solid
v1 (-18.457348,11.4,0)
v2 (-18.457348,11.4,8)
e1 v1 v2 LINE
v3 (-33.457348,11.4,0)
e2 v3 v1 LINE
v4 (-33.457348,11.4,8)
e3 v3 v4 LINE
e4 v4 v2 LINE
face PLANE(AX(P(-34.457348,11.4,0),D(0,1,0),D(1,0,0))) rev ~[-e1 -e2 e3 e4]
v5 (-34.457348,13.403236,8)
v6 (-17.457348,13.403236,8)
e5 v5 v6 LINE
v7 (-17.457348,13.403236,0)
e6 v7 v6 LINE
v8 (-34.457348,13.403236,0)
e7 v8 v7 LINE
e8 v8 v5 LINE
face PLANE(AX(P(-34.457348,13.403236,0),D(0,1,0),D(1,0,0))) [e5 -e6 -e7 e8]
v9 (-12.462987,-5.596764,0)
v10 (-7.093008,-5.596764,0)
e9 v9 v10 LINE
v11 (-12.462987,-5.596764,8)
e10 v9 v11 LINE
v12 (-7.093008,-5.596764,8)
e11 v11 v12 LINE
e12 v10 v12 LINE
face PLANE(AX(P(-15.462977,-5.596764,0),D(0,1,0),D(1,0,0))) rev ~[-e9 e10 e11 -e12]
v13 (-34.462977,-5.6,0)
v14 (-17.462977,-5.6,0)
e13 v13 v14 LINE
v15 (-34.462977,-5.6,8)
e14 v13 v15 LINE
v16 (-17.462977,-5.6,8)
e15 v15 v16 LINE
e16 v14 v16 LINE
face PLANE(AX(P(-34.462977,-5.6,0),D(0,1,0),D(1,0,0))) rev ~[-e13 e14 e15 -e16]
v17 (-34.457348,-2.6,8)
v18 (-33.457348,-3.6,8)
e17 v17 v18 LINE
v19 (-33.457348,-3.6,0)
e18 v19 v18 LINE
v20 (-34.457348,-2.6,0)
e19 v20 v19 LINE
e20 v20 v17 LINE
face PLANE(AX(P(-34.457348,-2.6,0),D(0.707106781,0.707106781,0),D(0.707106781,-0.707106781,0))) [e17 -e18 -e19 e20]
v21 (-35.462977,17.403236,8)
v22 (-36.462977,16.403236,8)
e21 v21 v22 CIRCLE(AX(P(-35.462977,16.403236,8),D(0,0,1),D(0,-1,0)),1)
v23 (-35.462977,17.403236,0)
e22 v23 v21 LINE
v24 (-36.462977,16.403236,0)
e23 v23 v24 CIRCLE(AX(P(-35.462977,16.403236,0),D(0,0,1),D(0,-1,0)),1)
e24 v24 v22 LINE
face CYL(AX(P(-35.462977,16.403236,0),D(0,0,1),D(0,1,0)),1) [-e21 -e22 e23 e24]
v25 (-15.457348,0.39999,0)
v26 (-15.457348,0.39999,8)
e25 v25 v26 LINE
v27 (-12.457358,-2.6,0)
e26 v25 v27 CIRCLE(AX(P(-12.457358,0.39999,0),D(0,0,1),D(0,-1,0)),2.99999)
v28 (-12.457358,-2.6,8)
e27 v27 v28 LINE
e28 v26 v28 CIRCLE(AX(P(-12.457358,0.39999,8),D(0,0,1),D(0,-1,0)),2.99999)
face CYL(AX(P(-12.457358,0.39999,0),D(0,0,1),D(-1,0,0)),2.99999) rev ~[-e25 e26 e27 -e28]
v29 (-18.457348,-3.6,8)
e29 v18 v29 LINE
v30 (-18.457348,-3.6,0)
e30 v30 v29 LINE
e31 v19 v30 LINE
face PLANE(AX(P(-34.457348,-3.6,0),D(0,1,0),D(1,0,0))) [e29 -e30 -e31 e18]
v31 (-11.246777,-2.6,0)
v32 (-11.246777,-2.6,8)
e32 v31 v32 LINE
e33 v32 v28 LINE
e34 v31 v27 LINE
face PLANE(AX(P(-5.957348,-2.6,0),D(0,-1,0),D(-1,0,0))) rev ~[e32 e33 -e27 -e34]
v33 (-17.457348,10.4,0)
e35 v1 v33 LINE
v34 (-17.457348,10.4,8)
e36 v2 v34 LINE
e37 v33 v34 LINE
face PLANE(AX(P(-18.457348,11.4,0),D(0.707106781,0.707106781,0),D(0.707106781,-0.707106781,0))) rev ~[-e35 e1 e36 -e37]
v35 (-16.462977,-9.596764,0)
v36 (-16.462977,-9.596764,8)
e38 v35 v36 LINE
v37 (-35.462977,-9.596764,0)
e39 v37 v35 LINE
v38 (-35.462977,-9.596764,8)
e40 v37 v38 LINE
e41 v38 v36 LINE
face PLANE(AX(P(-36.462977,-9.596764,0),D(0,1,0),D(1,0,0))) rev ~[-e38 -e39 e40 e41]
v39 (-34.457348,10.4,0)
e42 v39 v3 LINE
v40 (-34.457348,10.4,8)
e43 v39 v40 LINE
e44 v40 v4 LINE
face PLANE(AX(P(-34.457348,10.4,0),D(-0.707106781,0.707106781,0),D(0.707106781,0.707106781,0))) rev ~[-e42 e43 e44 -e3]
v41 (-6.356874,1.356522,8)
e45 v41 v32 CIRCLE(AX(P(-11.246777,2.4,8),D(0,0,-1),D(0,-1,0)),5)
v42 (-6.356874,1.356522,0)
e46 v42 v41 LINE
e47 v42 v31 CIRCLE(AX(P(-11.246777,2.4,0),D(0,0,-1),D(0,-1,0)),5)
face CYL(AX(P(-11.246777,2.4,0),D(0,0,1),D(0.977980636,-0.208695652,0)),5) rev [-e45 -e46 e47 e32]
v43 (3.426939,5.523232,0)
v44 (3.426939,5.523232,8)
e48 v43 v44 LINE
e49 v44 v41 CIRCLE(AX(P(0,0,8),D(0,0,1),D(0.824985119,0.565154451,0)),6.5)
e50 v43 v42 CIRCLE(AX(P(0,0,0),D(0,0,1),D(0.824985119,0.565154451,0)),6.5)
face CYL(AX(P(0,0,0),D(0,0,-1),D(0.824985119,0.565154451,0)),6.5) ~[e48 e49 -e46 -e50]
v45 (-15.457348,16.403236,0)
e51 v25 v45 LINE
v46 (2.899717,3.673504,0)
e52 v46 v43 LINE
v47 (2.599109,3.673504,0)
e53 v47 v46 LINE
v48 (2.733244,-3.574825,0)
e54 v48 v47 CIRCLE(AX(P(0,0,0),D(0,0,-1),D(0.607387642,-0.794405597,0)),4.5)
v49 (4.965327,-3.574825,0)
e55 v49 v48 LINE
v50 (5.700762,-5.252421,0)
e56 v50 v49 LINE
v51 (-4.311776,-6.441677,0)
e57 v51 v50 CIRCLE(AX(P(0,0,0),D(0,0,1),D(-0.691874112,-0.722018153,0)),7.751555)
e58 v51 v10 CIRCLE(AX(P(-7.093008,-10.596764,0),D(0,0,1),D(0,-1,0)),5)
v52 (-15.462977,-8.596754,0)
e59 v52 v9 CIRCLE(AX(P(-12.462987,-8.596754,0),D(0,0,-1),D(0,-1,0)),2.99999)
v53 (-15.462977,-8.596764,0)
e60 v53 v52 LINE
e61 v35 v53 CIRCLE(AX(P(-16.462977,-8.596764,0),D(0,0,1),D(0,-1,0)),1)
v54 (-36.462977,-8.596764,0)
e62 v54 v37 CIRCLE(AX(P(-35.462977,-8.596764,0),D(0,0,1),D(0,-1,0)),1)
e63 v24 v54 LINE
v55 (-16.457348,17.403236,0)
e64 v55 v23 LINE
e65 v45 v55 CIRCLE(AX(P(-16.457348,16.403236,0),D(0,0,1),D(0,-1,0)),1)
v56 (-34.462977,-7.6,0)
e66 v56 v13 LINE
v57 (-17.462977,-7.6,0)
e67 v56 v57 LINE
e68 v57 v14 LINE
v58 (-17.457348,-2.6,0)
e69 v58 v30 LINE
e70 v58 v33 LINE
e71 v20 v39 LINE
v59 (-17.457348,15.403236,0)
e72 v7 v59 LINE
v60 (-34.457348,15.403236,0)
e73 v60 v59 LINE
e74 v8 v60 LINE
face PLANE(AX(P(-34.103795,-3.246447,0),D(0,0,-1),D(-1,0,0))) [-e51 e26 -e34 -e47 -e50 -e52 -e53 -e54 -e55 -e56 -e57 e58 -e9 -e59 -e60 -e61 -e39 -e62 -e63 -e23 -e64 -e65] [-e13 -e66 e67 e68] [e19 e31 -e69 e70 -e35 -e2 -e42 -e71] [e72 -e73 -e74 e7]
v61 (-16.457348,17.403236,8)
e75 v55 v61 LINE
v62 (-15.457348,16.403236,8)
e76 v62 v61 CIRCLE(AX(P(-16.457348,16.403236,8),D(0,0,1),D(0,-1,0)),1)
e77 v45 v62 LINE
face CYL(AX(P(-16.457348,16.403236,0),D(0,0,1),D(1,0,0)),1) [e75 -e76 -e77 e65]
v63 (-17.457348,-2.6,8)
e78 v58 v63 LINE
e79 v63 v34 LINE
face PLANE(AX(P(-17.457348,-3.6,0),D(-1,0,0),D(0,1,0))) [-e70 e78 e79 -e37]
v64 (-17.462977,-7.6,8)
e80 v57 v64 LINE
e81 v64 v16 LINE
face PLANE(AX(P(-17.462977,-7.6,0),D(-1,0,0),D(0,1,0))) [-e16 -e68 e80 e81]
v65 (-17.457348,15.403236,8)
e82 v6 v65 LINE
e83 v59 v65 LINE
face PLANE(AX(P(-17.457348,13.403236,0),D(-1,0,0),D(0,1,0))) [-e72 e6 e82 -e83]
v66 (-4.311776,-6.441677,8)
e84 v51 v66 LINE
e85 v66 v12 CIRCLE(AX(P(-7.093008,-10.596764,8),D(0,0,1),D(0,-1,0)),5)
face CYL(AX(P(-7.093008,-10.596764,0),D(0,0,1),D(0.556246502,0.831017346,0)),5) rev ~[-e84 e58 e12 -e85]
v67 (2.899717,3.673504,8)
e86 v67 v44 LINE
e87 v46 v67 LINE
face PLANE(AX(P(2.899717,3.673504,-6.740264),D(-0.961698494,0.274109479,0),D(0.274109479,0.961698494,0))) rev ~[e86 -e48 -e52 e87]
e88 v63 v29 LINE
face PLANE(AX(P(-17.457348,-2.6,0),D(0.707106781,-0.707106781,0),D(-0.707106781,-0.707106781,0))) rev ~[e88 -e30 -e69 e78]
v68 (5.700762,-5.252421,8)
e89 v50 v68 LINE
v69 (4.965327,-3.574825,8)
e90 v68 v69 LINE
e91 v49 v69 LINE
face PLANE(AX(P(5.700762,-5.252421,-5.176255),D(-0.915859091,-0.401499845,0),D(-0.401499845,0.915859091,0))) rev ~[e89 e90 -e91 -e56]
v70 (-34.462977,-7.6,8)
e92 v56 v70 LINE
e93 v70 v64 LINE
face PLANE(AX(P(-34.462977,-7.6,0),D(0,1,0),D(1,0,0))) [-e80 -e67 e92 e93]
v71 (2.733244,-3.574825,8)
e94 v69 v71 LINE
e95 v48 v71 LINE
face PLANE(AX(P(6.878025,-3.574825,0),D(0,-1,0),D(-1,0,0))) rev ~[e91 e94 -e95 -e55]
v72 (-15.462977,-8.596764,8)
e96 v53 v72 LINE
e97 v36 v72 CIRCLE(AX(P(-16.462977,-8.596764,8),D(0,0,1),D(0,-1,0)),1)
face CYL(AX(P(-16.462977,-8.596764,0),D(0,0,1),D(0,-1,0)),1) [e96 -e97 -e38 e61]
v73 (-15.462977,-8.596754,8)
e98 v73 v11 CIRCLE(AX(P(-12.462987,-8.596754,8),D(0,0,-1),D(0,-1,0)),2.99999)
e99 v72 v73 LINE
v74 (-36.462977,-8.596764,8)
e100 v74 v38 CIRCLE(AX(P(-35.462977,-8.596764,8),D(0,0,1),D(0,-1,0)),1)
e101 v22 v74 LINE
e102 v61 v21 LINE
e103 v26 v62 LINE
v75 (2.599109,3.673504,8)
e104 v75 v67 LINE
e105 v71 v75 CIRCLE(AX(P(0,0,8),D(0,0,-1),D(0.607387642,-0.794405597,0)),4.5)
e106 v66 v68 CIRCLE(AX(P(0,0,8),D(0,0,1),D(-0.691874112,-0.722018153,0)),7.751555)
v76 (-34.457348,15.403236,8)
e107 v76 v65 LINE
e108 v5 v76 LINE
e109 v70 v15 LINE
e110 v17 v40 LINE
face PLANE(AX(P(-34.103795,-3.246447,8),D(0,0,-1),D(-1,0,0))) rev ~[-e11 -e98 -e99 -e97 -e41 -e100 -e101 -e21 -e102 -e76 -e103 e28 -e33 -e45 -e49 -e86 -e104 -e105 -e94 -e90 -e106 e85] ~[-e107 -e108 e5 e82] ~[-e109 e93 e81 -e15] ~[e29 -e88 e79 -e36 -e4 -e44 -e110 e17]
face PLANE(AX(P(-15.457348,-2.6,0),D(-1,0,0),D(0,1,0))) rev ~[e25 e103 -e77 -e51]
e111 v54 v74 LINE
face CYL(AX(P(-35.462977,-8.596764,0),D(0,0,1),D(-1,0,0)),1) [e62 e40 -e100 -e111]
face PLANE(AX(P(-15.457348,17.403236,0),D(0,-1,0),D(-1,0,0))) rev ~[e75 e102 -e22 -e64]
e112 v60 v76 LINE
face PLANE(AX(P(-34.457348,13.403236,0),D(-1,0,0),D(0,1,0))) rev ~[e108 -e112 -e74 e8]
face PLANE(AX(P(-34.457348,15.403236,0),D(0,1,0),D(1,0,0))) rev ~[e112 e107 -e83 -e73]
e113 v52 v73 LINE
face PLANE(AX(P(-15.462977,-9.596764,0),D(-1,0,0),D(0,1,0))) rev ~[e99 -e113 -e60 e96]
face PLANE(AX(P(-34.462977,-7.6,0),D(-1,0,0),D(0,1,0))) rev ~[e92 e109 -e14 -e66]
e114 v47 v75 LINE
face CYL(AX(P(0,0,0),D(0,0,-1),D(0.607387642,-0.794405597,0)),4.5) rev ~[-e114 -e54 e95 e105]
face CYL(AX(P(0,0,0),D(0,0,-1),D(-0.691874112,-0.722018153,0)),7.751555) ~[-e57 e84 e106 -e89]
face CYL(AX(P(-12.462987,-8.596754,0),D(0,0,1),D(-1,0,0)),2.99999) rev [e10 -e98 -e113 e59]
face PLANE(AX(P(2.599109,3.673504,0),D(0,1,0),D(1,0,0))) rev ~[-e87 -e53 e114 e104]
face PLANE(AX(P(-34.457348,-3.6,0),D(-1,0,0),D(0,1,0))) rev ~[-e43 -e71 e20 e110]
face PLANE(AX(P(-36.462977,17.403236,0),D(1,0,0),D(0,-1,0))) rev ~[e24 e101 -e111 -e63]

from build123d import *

# Parameters (mm, degrees)
F0_W        = 17
F0_H        = 2
F0_H_2      = 15
F1_DEPTH    = 8
F2_R        = 5
F3_T1_DEPTH = 8
F3_T3_DEPTH = 18.3525106995
F3_T5_DEPTH = 21.4805273161
F4_R        = 1
F5_R        = 2.99999


# Not quite as in the source:
# - a fillet or chamfer that OpenCascade refuses, or shapes differently, is made with other operations: its cross-section is extruded or revolved along the edge and cut away or added
# - a fillet or chamfer is up to 0.001 mm smaller than in the source, because OpenCascade refuses the exact size


with BuildPart() as f1:
    # F0 (on Top) → F1 (new body)
    with BuildSketch(Plane.XY):
        with BuildLine():
            ThreePointArc((2.7332443879, -3.5748251868), (-4.4992296638, -0.0832612306), (2.5991092476, 3.6735039294))
            Line((2.5991092476, 3.6735039294), (5.3624032747, 3.6735039294))
            ThreePointArc((5.3624032747, 3.6735039294), (-3.1508257353, 5.6852701946), (-5.9573484034, -2.6))
            Line((-5.9573484034, -2.6), (-15.4573484034, -2.6))
            Line((-15.4573484034, -2.6), (-15.4573484034, 13.4))
            Line((-15.4573484034, 13.4), (-15.4573484034, 17.4032363431))
            Line((-15.4573484034, 17.4032363431), (-36.4629774356, 17.4032363431))
            Line((-36.4629774356, 17.4032363431), (-36.4629774356, 11.4032363431))
            Line((-36.4629774356, 11.4032363431), (-36.4629774356, -9.5967636569))
            Line((-36.4629774356, -9.5967636569), (-15.4629774356, -9.5967636569))
            Line((-15.4629774356, -9.5967636569), (-15.4629774356, -5.5967636569))
            Line((-15.4629774356, -5.5967636569), (-5.3631004506, -5.5967636569))
            ThreePointArc((-5.3631004506, -5.5967636569), (1.2632530504, -7.6479279289), (6.8780254985, -3.5748251868))
            Line((6.8780254985, -3.5748251868), (2.7332443879, -3.5748251868))
        make_face()
        with Locations((-25.9629774356, -6.6)):
            Rectangle(F0_W, F0_H, mode=Mode.SUBTRACT)
        with Locations((-25.9573484034, 3.9)):
            Rectangle(F0_W, F0_H_2, mode=Mode.SUBTRACT)
        with Locations((-25.9573484034, 14.4032363431)):
            Rectangle(F0_W, F0_H, mode=Mode.SUBTRACT)
    extrude(amount=F1_DEPTH)

    # F2
    f2_edges = [f1.edges().sort_by_distance(p)[0] for p in [
        (-5.957348, -2.6, 4),
        (-5.3631, -5.596764, 4),
    ]]
    fillet(f2_edges, radius=F2_R)

    # F3: chamfer of 1 on 6 edges, made by hand

    # F3_s2 → F3_t1 (join)
    with BuildSketch(Plane.XY):
        Polygon((-34.4573484034, -2.6), (-33.4573484034, -3.6), (-34.4573484034, -3.6), align=None)
        Polygon((-34.4573484034, 10.4), (-33.4573484034, 11.4), (-34.4573484034, 11.4), align=None)
        Polygon((-18.4573484034, 11.4), (-17.4573484034, 10.4), (-17.4573484034, 11.4), align=None)
        Polygon((-17.4573484034, -2.6), (-18.4573484034, -3.6), (-17.4573484034, -3.6), align=None)
    extrude(amount=F3_T1_DEPTH)

    # F3_s4 → F3_t3 (cut)
    with BuildSketch(Plane.XY.offset(-5.1762553498)):
        with BuildLine():
            Line((5.7007617196, -5.2524209363), (4.9653271539, -3.5748251868))
            Line((4.9653271539, -3.5748251868), (6.8780254985, -3.5748251868))
            ThreePointArc((6.8780254985, -3.5748251868), (6.3390727508, -4.4612516781), (5.7007617196, -5.2524209363))
        make_face()
    extrude(amount=F3_T3_DEPTH, mode=Mode.SUBTRACT)

    # F3_s6 → F3_t5 (cut)
    with BuildSketch(Plane.XY.offset(-6.740263658)):
        with BuildLine():
            Line((2.8997174039, 3.6735039294), (3.42693875, 5.5232319165))
            ThreePointArc((3.42693875, 5.5232319165), (4.4840607821, 4.7056560544), (5.3624032747, 3.6735039294))
            Line((5.3624032747, 3.6735039294), (2.8997174039, 3.6735039294))
        make_face()
    extrude(amount=F3_T5_DEPTH, mode=Mode.SUBTRACT)

    # F4
    f4_edges = [f1.edges().sort_by_distance(p)[0] for p in [
        (-15.462977, -9.596764, 4),
        (-36.462977, 17.403236, 4),
        (-15.457348, 17.403236, 4),
        (-36.462977, -9.596764, 4),
    ]]
    fillet(f4_edges, radius=F4_R)

    # F5 (radius 3 in the source; OpenCascade refuses exactly that, so slightly less here)
    f5_edges = [f1.edges().sort_by_distance(p)[0] for p in [
        (-15.457348, -2.6, 4),
        (-15.462977, -5.596764, 4),
    ]]
    fillet(f5_edges, radius=F5_R)


solid = f1.part
